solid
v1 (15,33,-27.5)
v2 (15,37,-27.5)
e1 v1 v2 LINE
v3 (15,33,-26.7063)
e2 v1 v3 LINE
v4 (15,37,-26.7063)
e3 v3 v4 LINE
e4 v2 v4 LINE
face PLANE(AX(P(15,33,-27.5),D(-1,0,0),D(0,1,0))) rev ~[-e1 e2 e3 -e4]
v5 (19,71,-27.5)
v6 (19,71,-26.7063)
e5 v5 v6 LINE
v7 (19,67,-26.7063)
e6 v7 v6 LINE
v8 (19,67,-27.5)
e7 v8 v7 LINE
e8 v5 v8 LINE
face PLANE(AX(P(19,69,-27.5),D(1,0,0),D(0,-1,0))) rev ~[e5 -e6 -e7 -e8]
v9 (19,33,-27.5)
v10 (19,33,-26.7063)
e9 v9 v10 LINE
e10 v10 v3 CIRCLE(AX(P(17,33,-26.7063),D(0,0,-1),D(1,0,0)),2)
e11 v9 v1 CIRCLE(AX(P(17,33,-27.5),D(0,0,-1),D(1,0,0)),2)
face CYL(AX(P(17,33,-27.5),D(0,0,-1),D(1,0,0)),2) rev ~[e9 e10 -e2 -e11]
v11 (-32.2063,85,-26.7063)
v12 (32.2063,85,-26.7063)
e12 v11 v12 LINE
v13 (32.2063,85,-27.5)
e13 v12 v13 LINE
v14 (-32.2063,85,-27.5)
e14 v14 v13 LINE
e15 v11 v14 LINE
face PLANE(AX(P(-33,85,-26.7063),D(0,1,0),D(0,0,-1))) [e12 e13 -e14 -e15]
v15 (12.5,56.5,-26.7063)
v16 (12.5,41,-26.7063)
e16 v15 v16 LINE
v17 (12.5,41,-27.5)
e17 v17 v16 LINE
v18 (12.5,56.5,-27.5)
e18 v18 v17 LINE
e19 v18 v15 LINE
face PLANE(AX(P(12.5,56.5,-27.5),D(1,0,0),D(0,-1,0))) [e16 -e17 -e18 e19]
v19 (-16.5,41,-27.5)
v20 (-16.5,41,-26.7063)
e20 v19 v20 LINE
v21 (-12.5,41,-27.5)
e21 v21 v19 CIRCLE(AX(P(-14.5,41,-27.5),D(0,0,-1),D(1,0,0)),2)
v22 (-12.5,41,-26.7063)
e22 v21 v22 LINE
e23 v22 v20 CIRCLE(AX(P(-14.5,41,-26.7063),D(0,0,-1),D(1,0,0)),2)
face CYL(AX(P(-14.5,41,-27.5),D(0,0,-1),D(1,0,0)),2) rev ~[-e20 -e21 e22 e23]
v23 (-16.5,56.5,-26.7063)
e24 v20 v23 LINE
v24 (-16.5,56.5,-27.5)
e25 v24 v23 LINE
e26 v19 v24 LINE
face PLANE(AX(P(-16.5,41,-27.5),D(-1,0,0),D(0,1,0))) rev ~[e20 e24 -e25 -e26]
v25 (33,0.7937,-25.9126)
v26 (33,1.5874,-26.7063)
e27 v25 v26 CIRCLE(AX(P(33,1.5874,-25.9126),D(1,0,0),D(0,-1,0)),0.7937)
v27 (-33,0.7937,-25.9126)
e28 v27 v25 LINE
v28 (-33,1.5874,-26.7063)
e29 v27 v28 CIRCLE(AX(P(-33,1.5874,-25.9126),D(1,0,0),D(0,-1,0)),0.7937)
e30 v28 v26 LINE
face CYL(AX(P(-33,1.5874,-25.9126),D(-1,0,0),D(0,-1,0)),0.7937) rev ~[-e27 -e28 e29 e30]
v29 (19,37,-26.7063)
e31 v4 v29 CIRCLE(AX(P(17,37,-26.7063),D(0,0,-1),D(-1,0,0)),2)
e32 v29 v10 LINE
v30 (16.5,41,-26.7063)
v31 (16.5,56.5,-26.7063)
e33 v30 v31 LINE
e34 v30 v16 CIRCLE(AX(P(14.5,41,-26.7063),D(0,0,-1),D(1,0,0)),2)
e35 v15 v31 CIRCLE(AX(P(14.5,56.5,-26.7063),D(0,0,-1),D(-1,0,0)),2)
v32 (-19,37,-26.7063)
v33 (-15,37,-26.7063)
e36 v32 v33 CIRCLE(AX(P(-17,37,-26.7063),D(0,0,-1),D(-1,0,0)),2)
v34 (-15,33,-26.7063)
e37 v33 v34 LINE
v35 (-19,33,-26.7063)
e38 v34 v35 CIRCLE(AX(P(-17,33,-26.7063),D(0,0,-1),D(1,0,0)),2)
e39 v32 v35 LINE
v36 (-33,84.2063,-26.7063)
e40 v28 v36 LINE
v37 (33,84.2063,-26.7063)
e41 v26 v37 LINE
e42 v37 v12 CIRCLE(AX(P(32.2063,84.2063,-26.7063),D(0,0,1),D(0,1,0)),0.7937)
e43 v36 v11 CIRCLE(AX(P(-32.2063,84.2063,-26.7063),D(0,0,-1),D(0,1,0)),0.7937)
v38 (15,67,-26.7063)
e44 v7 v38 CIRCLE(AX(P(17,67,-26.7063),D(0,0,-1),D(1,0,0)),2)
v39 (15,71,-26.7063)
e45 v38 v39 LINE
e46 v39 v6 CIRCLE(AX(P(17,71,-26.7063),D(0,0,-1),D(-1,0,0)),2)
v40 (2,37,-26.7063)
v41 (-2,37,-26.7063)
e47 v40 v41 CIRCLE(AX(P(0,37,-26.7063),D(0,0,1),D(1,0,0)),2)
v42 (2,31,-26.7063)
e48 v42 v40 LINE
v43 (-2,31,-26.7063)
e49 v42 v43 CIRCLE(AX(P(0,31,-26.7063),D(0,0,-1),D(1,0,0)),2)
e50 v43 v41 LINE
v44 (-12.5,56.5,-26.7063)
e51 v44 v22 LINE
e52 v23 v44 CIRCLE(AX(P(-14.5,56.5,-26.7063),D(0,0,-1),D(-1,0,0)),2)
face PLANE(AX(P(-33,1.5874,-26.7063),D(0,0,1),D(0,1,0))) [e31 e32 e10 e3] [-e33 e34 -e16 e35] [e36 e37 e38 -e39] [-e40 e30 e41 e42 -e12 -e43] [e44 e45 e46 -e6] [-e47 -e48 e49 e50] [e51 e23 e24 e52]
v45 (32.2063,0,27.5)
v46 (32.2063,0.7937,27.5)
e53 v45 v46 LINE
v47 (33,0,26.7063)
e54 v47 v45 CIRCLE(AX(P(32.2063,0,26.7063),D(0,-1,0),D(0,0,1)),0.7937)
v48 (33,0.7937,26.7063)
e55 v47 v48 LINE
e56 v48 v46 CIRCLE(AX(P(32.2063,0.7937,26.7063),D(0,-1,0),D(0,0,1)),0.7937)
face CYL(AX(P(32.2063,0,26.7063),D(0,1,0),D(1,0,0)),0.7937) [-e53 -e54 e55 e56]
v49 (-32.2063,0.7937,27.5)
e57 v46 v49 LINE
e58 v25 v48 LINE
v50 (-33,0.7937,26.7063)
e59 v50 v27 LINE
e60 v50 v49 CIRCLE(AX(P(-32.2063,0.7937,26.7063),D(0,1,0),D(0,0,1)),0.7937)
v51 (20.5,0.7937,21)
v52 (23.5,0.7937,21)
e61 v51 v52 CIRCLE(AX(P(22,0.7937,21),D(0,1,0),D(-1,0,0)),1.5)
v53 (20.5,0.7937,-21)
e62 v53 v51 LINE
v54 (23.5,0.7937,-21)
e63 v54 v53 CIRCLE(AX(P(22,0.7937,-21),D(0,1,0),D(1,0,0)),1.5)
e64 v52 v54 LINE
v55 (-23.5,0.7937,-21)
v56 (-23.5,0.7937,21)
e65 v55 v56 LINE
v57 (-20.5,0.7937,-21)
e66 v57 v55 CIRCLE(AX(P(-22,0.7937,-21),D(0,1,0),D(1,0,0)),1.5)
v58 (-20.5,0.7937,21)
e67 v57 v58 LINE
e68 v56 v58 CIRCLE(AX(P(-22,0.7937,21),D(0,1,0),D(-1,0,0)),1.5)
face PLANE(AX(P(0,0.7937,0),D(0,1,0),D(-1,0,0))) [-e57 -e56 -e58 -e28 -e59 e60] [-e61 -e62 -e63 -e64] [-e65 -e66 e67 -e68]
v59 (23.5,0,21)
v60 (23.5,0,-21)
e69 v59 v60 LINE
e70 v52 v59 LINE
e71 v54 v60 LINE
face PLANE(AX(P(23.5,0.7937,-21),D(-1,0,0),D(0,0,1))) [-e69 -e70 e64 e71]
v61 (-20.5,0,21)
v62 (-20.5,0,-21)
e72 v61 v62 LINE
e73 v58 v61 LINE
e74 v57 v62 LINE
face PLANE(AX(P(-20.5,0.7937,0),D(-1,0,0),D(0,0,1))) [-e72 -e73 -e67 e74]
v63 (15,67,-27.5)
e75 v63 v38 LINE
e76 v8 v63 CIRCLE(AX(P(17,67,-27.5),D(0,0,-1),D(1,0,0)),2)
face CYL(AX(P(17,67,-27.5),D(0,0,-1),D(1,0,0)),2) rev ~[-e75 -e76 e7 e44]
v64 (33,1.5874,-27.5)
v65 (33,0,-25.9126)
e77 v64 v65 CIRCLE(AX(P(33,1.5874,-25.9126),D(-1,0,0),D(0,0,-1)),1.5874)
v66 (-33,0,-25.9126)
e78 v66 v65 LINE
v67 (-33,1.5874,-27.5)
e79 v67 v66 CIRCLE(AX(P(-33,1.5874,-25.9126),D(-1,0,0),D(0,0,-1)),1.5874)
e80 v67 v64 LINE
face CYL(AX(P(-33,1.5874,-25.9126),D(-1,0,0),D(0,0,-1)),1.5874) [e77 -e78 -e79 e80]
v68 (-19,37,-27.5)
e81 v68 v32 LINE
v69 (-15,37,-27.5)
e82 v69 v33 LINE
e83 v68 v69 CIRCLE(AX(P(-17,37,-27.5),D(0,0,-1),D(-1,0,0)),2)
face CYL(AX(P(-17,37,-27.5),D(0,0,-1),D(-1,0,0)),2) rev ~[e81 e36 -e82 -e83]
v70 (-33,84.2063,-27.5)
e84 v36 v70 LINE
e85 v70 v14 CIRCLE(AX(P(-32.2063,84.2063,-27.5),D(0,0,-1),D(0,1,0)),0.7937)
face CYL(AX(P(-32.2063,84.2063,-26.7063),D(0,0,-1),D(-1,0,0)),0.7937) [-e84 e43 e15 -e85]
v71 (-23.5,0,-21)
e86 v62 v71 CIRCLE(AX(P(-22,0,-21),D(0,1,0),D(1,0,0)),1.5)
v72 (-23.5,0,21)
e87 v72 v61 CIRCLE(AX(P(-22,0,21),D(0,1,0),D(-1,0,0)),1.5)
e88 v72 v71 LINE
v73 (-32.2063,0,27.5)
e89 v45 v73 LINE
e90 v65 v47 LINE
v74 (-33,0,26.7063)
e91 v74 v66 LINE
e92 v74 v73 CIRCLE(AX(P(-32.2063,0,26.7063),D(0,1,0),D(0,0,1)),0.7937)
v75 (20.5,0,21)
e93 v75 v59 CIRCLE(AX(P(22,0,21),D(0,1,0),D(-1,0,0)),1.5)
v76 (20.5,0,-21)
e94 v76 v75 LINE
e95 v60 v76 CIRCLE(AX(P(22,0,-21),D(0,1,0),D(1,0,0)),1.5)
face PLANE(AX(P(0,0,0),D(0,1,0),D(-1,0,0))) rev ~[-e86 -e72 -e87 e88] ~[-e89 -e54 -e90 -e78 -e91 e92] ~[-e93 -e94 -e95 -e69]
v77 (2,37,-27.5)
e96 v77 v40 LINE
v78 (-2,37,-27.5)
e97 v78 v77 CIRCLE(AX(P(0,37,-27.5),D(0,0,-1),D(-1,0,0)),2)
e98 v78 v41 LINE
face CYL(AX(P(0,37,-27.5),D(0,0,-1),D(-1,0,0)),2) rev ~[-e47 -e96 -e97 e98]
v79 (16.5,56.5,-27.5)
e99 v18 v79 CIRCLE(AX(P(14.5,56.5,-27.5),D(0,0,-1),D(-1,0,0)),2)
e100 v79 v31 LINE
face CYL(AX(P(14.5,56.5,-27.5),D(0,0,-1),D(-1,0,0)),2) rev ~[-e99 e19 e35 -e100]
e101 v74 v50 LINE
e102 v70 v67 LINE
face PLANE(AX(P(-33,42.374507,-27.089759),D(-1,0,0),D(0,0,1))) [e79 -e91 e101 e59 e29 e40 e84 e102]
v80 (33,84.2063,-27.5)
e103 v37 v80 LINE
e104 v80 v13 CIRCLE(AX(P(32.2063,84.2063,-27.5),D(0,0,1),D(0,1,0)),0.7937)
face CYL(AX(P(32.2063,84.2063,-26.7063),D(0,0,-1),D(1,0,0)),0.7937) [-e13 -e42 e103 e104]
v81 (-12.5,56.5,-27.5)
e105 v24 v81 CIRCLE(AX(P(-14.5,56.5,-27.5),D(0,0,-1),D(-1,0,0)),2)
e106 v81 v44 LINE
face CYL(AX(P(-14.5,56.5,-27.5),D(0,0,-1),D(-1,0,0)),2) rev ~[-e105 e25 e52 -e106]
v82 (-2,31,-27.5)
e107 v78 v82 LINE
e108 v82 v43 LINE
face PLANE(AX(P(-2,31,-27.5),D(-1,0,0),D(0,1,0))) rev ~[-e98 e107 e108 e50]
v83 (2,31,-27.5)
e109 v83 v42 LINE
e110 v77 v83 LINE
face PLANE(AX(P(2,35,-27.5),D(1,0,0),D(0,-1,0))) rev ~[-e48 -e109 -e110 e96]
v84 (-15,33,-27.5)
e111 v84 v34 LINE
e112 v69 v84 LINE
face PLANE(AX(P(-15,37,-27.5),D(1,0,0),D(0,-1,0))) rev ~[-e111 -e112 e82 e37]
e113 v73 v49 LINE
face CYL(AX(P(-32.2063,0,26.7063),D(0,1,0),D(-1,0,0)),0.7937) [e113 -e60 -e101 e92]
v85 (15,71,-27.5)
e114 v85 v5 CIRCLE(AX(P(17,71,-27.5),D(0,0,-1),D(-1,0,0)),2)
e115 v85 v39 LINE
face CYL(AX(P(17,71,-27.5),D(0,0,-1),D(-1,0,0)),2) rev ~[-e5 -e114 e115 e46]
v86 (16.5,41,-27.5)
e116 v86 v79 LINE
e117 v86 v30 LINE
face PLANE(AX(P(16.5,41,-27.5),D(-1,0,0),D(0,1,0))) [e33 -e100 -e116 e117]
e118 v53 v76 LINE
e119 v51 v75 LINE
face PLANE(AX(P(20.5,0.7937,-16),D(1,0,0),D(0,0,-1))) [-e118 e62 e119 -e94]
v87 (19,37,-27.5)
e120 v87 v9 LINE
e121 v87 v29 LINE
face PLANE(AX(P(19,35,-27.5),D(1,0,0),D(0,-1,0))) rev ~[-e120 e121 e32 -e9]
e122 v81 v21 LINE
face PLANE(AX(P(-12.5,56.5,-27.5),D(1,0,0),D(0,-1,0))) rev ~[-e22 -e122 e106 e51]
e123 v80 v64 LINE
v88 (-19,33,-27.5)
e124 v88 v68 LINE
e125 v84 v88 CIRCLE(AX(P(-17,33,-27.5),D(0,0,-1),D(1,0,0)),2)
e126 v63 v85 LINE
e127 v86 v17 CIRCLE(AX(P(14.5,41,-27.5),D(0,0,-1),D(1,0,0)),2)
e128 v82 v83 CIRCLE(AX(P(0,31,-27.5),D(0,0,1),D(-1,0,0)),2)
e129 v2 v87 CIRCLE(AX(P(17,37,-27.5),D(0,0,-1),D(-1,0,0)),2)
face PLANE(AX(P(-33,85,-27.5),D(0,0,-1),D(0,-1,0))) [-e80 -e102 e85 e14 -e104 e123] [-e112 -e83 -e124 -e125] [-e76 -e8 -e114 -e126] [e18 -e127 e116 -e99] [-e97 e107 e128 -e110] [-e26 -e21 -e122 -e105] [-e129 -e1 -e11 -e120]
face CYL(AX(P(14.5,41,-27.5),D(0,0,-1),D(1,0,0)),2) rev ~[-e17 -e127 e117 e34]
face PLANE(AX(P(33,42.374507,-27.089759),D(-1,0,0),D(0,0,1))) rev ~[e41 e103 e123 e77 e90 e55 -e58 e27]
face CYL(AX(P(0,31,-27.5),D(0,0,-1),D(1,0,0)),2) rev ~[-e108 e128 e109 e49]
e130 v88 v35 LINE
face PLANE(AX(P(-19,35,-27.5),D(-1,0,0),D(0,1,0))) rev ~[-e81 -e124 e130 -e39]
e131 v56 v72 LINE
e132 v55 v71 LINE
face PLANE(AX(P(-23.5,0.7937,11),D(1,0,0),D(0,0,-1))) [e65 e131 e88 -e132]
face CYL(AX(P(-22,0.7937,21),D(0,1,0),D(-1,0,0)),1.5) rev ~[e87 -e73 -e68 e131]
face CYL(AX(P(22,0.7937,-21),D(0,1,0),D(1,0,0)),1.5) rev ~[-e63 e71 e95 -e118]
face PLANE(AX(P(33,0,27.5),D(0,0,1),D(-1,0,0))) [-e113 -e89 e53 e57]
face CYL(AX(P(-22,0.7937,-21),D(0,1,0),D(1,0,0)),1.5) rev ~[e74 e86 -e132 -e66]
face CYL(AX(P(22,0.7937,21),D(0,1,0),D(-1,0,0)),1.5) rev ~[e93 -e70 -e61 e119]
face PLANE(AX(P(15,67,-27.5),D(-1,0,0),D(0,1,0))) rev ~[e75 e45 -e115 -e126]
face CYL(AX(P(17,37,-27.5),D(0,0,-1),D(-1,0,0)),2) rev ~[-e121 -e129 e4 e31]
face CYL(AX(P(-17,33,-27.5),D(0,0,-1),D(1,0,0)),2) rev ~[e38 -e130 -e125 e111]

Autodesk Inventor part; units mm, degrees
ref_plane "YZ Plane" through (0, 0, 0) normal (1, 0, 0) x (0, 1, 0)
ref_plane "XZ Plane" through (0, 0, 0) normal (0, 1, 0) x (-1, 0, 0)
ref_plane "XY Plane" through (0, 0, 0) normal (0, 0, 1) x (1, 0, 0)
sketch "Sketch1" plane through (0, 0, 0) normal (0, 1, 0) x (-1, 0, 0)
  line L0 (33, -27.5) -> (-33, -27.5)
  line L1 (-33, -27.5) -> (-33, 27.5)
  line L2 (-33, 27.5) -> (33, 27.5)
  line L3 (33, 27.5) -> (33, -27.5)
  line L4 (33, -27.5) -> (-33, 27.5) construction
  line L5 (-33, -27.5) -> (33, 27.5) construction
  point P0 (0, 0)
  dimension "d0" = 66
  dimension "d1" = 55
extrude "Plate1" add sketch "Sketch1" along normal blind 0.7937
sketch "Sketch3" plane through (0, 0.7937, 0) normal (0, 1, 0) x (1, 0, 0)
  line L0 (0, 0) -> (-33, 0)
  line L1 (-33, 0) -> (-33, 27.5)
  line L2 (-33, 27.5) -> (0, 27.5)
  line L3 (0, 27.5) -> (0, 0)
  circle A0 centre (-22, 16) radius 1.5
  circle A1 centre (-22, -16) radius 1.5
  circle A2 centre (22, 16) radius 1.5
  circle A3 centre (22, -16) radius 1.5
  line L4 (-22, 11) -> (-22, 21) construction
  line L5 (-20.5, 11) -> (-20.5, 21)
  line L6 (-23.5, 21) -> (-23.5, 11)
  arc A4 (-23.5, 11) -> (-20.5, 11) centre (-22, 11) ccw
  arc A5 (-20.5, 21) -> (-23.5, 21) centre (-22, 21) ccw
  line L7 (20.5, 11) -> (20.5, 21)
  line L8 (23.5, 21) -> (23.5, 11)
  arc A6 (20.5, 11) -> (23.5, 11) centre (22, 11) ccw
  arc A7 (23.5, 21) -> (20.5, 21) centre (22, 21) ccw
  line L9 (-20.5, -11) -> (-20.5, -21)
  line L10 (-23.5, -21) -> (-23.5, -11)
  arc A8 (-20.5, -11) -> (-23.5, -11) centre (-22, -11) ccw
  arc A9 (-23.5, -21) -> (-20.5, -21) centre (-22, -21) ccw
  arc A10 (20.5, -21) -> (23.5, -21) centre (22, -21) ccw
  line L11 (23.5, -21) -> (23.5, -11)
  line L12 (20.5, -11) -> (20.5, -21)
  arc A11 (23.5, -11) -> (20.5, -11) centre (22, -11) ccw
  line L13 (-23.5, 16) -> (-20.5, 16)
  line L14 (-20.5, 16) -> (-20.5, -16)
  line L15 (-20.5, -16) -> (-23.5, -16)
  line L16 (-23.5, -16) -> (-23.5, 16)
  line L17 (20.5, -16) -> (23.5, -16)
  line L18 (23.5, -16) -> (23.5, 16)
  line L19 (23.5, 16) -> (20.5, 16)
  line L20 (20.5, 16) -> (20.5, -16)
  dimension "d22" = 3
  dimension "d23" = 32
  dimension "d24" = 22
  dimension "d48" = 5
  dimension "d49" = 3
extrude "Cut1" cut sketch "Sketch3" against normal blind 0.7937 contours L14 A8 L16 L0 | L0 L16 A4 L14 | A4 L6 A0 L5 | L9 A1 L10 A8 | L13 A0 | A0 L6 A5 L5 | A0 L13 | L15 A1 | L9 A9 L10 A1 | A1 L15 | L19 A2 | L8 A6 L7 A2 | A2 L7 A7 L8 | A2 L19 | L18 A11 L20 A6 | L11 A3 L12 A11 | L17 A3 | L11 A10 L12 A3 | A3 L17
sketch "Sketch2" plane through (-33, 0, -26.7063) normal (0, 0, -1) x (-1, 0, 0)
  line L0 (-66, 0) -> (0, 0)
  line L1 (0, 0) -> (0, 85)
  line L2 (0, 85) -> (-66, 85)
  line L3 (-66, 85) -> (-66, 0)
edge flange "Flange1" height 70 angle 90 thickness 0.7937 bend radius 0.7937 thickness toward (0, 0, -1) relief tear relief width 0.7937 relief depth 0.3969 edges at (0, 0.7937, -27.5) wall of the first edge with corners at (33, 0, -26.7063) (-33, 0, -26.7063) (-33, 85, -26.7063) (33, 85, -26.7063)
bend "Bend1"
corner "Corner1"
sketch "Sketch4" plane through (33, 85, -27.5) normal (0, 0, -1) x (-1, 0, 0)
  line L0 (0, -83.4125) -> (66, -83.4125) projected
  line L1 (66, 0) -> (66, -83.4125) projected
  line L2 (0, 0) -> (66, 0) projected
  line L3 (33, -54) -> (33, -48) construction
  line L4 (35, -54) -> (35, -48)
  line L5 (31, -48) -> (31, -54)
  arc A0 (31, -54) -> (35, -54) centre (33, -54) ccw
  arc A1 (35, -48) -> (31, -48) centre (33, -48) ccw
  line L6 (33, -83.4125) -> (33, 0)
  line L7 (47.5, -44) -> (47.5, -28.5) construction
  line L8 (49.5, -44) -> (49.5, -28.5)
  line L9 (45.5, -28.5) -> (45.5, -44)
  arc A2 (45.5, -44) -> (49.5, -44) centre (47.5, -44) ccw
  arc A3 (49.5, -28.5) -> (45.5, -28.5) centre (47.5, -28.5) ccw
  line L10 (18.5, -44) -> (18.5, -28.5) construction
  line L11 (16.5, -44) -> (16.5, -28.5)
  line L12 (20.5, -28.5) -> (20.5, -44)
  arc A4 (16.5, -44) -> (20.5, -44) centre (18.5, -44) ccw
  arc A5 (20.5, -28.5) -> (16.5, -28.5) centre (18.5, -28.5) ccw
  line L13 (66, -85) -> (0, -85) projected
  line L14 (16, -50) -> (50, -50)
  line L15 (50, -50) -> (50, -16)
  line L16 (50, -16) -> (16, -16)
  line L17 (16, -16) -> (16, -50)
  circle A6 centre (16, -16) radius 2
  circle A7 centre (16, -50) radius 2
  circle A8 centre (50, -50) radius 2
  line L18 (33, -16) -> (33, -50)
  line L19 (16, -18) -> (16, -14) construction
  line L20 (18, -18) -> (18, -14)
  line L21 (14, -14) -> (14, -18)
  arc A9 (14, -18) -> (18, -18) centre (16, -18) ccw
  arc A10 (18, -14) -> (14, -14) centre (16, -14) ccw
  line L22 (16, -52) -> (16, -48) construction
  line L23 (18, -52) -> (18, -48)
  line L24 (14, -48) -> (14, -52)
  arc A11 (14, -52) -> (18, -52) centre (16, -52) ccw
  arc A12 (18, -48) -> (14, -48) centre (16, -48) ccw
  line L25 (50, -52) -> (50, -48) construction
  line L26 (52, -52) -> (52, -48)
  line L27 (48, -48) -> (48, -52)
  arc A13 (48, -52) -> (52, -52) centre (50, -52) ccw
  arc A14 (52, -48) -> (48, -48) centre (50, -48) ccw
  point P0 (33, -85)
  point P1 (33, -51)
  point P2 (47.5, -36.25)
  point P3 (18.5, -36.25)
  dimension "d25" = 3
  dimension "d26" = 4
  dimension "d29" = 4
  dimension "d30" = 15.5
  dimension "d31" = 14.5
  dimension "d46" = 48.75
  dimension "d47" = 34
  dimension "d50" = 34
  dimension "d51" = 34
  dimension "d52" = 4
  dimension "d53" = 4
  dimension "d54" = 4
  dimension "d55" = 35
  dimension "d56" = 0
  dimension "d57" = 2
  dimension "d58" = 4
  dimension "d59" = 2
  dimension "d60" = 4
  dimension "d61" = 2
  dimension "d62" = 4
extrude "Cut2" cut sketch "Sketch4" against normal blind 0.7937 contours L6 L14 L4 A0 | A0 L5 L14 L6 | L14 L5 A1 L6 | L6 A1 L4 L14 | A7 L17 L14 | L14 L17 A7 | L23 A11 L24 A7 | A7 L17 A12 L23 | A8 L15 L14 | L27 A14 L15 A8 | L14 L15 A8 | A8 L26 A13 L27 | A6 L17 L16 | L16 L17 A6 | L20 A9 L17 A6 | A6 L21 A10 L20 | A7 L24 A12 L17 | L15 A14 L26 A8 | A6 L17 A9 L21 | A2 L9 A3 L8 | L11 A5 L12 A4
fillet "Corner Round1" radius 0.7937 4 edges at (-33, 0.3969, 27.5) (33, 0.3969, 27.5) (33, 85, -27.1031) (-33, 85, -27.1031)
equation "\"d0\" = subframe_x"
equation "\"d1\" = subframe_y"
equation "\"d22\" = m3_diameter"
equation "\"d23\" = 0.4 * frame_y"
equation "\"d24\" = 0.333333 * subframe_x"
equation "\"d49\" = m3_diameter"
equation "\"d20\" = Thickness"
equation "\"d26\" = m4_diameter"
equation "\"d29\" = m4_diameter"
equation "\"d33\" = Thickness"
equation "\"d3\" = BendReliefWidth"
equation "\"d4\" = BendReliefDepth"
equation "\"d5\" = MinimumRemnant"
equation "\"d6\" = BendRadius"
equation "\"d9\" = BendRadius"
equation "\"d11\" = CornerReliefSize"
equation "\"d12\" = GapSize"
equation "\"d13\" = JacobiRadiusSize"
equation "\"BendRadius\" = Thickness"
equation "\"BendReliefWidth\" = Thickness"
equation "\"BendReliefDepth\" = 0.5 * Thickness"
equation "\"CornerReliefSize\" = 4 * Thickness"
equation "\"MinimumRemnant\" = 2 * Thickness"
equation "\"TransitionRadius\" = BendRadius"
equation "\"JacobiRadiusSize\" = BendRadius"
equation "\"GapSize\" = Thickness"
equation "\"sm_thickness\" = 1.5875"
equation "\"very_thick_acrylic\" = 9.45"
equation "\"thick_acrylic\" = 5.88"
equation "\"thin_acrylic\" = 3.15"
equation "\"clear_acrylic\" = 3.15"
equation "\"wood_thickness\" = 6.72"
equation "\"m3_diameter\" = 3"
equation "\"m3_head\" = 6"
equation "\"m4_diameter\" = 4"
equation "\"m5_diameter\" = 5"
equation "\"m5_head\" = 10.3"
equation "\"brass_insert_drill\" = 4"
equation "\"m5_brass_insert_drill\" = 6.7"
equation "\"m3_press_nut_drill\" = 4.5"
equation "\"m5_press_nut_drill\" = 6.5"
equation "\"laser_body_diameter\" = 12"
equation "\"carrier_y\" = 251"
equation "\"carrier_z\" = 12"
equation "\"visor_x\" = 253.925"
equation "\"visor_y\" = 85.6"
equation "\"window_z\" = 332.225"
equation "\"window_y\" = 93.75"
equation "\"window_overlap\" = 48"
equation "\"acrylic_into_frame\" = 5"
equation "\"door_x\" = 251"
equation "\"door_z\" = 332.225"
equation "\"door_overlap\" = 48"
equation "\"linear_bearing_spacing\" = 198"
equation "\"tray_border\" = 25"
equation "\"bed_z\" = 25"
equation "\"crane_x\" = 223"
equation "\"crane_z2\" = 12"
equation "\"switch_spacing\" = 19"
equation "\"frame_top_z\" = 385"
equation "\"frame_bottom_z\" = 275"
equation "\"frame_total_z\" = 661.5875"
equation "\"frame_face_y\" = 45"
equation "\"frame_foot_z\" = 12"
equation "\"frame_screw_from_center\" = 25"
equation "\"laser_y_offset\" = 19.4"
equation "\"laser_diameter\" = 13"
equation "\"laser_z_offset\" = 55"
equation "\"laser_y\" = 15"
equation "\"laser_z\" = 75"
equation "\"laser_gap\" = 1"
equation "\"subframe_x\" = 66"
equation "\"subframe_y\" = 55"
equation "\"galvo_frame_x\" = 66"
equation "\"galvo_frame_z\" = 85"
equation "\"galvo_frame_y_offset\" = 27.5"
equation "\"drawer_x\" = 191.7875"
equation "\"drawer_y\" = 67.5"
equation "\"drawer_support_from_top\" = 48"
equation "\"drawer_screw_from_center\" = 55"
equation "\"nema17_x\" = 43"
equation "\"d2\" = BendRadius"
equation "\"d44\" = galvo_frame_x"
equation "\"al_thickness\" = 1.5875"
equation "\"rivet_diameter\" = 3.3"
equation "\"bend_factor\" = 2.26205"
equation "\"sm_bend\" = 3.591"
equation "\"al_bend\" = 3.591"
equation "\"frame_x\" = 353.375"
equation "\"carrier_z2\" = 25"
equation "\"carrier_y2\" = 76.825"
equation "\"injection_plastic\" = 3.15"
equation "\"handle_d\" = 4.7625"
equation "\"lmk8uu_shaft\" = 15"
equation "\"al2_bend\" = 3.591"
equation "\"al3_bend\" = 3.591"
equation "\"st2_thickness\" = 1.5875"
equation "\"st3_bend\" = 3.591"
equation "\"al1_bend\" = 1.7955"
equation "\"st2_bend\" = 3.591"
equation "\"st1_thickness\" = 0.79375"
equation "\"st3_thickness\" = 1.5875"
equation "\"al1_thickness\" = 0.79375"
equation "\"st1_bend\" = 1.7955"
equation "\"al3_thickness\" = 1.5875"
equation "\"acme_nut_d\" = 19.1"
equation "\"platform_upper_y\" = 46.625"
equation "\"frame_back_z\" = 498.2125"
equation "\"drawer_reservoir_overlap_x\" = 19.20625"
equation "\"acrylic1_thickness\" = 5.88"
equation "\"laserresin\" = 5"
equation "\"platform_fold_x\" = 25"
equation "\"crane_t\" = 1.5875"
equation "\"reservoir_t\" = 0.79375"
equation "\"platform_crane_gap\" = 0.1"
equation "\"al2_thickness\" = 1.5875"
equation "\"laser_holder_z\" = 75"
equation "\"crane_gap\" = 0.1"
equation "\"drawer_gap\" = 0.1"
equation "\"frame_gap\" = 0.1"
equation "\"acrylic3_thickness\" = 3.15"
equation "\"laser_holder_t\" = 0.79375"
equation "\"frame_back_y\" = 53.2125"
equation "\"foot_z\" = 15"
equation "\"drawer_t\" = 0.79375"
equation "\"frame_back_x\" = 268.2125"
equation "\"frame_back_t\" = 0.79375"
equation "\"frame_front_fold\" = 15"
equation "\"acme_nut_upper_d\" = 12.7"
equation "\"platform_t\" = 1.5875"
equation "\"tray_t\" = 5.88"
equation "\"foot_t\" = 0.79375"
equation "\"frame_front_y\" = 55"
equation "\"reservoir_flap_y\" = 20.79375"
equation "\"handle_hole_d\" = 5.0625"
equation "\"acrylic2_thickness\" = 3.15"
equation "\"drawer_fold\" = 15"
equation "\"handle_spacing\" = 50.8"
equation "\"frame_y\" = 80"
equation "\"Thickness\" = 0.79375"
properties part number "subframe" material "Aluminum 6061"
